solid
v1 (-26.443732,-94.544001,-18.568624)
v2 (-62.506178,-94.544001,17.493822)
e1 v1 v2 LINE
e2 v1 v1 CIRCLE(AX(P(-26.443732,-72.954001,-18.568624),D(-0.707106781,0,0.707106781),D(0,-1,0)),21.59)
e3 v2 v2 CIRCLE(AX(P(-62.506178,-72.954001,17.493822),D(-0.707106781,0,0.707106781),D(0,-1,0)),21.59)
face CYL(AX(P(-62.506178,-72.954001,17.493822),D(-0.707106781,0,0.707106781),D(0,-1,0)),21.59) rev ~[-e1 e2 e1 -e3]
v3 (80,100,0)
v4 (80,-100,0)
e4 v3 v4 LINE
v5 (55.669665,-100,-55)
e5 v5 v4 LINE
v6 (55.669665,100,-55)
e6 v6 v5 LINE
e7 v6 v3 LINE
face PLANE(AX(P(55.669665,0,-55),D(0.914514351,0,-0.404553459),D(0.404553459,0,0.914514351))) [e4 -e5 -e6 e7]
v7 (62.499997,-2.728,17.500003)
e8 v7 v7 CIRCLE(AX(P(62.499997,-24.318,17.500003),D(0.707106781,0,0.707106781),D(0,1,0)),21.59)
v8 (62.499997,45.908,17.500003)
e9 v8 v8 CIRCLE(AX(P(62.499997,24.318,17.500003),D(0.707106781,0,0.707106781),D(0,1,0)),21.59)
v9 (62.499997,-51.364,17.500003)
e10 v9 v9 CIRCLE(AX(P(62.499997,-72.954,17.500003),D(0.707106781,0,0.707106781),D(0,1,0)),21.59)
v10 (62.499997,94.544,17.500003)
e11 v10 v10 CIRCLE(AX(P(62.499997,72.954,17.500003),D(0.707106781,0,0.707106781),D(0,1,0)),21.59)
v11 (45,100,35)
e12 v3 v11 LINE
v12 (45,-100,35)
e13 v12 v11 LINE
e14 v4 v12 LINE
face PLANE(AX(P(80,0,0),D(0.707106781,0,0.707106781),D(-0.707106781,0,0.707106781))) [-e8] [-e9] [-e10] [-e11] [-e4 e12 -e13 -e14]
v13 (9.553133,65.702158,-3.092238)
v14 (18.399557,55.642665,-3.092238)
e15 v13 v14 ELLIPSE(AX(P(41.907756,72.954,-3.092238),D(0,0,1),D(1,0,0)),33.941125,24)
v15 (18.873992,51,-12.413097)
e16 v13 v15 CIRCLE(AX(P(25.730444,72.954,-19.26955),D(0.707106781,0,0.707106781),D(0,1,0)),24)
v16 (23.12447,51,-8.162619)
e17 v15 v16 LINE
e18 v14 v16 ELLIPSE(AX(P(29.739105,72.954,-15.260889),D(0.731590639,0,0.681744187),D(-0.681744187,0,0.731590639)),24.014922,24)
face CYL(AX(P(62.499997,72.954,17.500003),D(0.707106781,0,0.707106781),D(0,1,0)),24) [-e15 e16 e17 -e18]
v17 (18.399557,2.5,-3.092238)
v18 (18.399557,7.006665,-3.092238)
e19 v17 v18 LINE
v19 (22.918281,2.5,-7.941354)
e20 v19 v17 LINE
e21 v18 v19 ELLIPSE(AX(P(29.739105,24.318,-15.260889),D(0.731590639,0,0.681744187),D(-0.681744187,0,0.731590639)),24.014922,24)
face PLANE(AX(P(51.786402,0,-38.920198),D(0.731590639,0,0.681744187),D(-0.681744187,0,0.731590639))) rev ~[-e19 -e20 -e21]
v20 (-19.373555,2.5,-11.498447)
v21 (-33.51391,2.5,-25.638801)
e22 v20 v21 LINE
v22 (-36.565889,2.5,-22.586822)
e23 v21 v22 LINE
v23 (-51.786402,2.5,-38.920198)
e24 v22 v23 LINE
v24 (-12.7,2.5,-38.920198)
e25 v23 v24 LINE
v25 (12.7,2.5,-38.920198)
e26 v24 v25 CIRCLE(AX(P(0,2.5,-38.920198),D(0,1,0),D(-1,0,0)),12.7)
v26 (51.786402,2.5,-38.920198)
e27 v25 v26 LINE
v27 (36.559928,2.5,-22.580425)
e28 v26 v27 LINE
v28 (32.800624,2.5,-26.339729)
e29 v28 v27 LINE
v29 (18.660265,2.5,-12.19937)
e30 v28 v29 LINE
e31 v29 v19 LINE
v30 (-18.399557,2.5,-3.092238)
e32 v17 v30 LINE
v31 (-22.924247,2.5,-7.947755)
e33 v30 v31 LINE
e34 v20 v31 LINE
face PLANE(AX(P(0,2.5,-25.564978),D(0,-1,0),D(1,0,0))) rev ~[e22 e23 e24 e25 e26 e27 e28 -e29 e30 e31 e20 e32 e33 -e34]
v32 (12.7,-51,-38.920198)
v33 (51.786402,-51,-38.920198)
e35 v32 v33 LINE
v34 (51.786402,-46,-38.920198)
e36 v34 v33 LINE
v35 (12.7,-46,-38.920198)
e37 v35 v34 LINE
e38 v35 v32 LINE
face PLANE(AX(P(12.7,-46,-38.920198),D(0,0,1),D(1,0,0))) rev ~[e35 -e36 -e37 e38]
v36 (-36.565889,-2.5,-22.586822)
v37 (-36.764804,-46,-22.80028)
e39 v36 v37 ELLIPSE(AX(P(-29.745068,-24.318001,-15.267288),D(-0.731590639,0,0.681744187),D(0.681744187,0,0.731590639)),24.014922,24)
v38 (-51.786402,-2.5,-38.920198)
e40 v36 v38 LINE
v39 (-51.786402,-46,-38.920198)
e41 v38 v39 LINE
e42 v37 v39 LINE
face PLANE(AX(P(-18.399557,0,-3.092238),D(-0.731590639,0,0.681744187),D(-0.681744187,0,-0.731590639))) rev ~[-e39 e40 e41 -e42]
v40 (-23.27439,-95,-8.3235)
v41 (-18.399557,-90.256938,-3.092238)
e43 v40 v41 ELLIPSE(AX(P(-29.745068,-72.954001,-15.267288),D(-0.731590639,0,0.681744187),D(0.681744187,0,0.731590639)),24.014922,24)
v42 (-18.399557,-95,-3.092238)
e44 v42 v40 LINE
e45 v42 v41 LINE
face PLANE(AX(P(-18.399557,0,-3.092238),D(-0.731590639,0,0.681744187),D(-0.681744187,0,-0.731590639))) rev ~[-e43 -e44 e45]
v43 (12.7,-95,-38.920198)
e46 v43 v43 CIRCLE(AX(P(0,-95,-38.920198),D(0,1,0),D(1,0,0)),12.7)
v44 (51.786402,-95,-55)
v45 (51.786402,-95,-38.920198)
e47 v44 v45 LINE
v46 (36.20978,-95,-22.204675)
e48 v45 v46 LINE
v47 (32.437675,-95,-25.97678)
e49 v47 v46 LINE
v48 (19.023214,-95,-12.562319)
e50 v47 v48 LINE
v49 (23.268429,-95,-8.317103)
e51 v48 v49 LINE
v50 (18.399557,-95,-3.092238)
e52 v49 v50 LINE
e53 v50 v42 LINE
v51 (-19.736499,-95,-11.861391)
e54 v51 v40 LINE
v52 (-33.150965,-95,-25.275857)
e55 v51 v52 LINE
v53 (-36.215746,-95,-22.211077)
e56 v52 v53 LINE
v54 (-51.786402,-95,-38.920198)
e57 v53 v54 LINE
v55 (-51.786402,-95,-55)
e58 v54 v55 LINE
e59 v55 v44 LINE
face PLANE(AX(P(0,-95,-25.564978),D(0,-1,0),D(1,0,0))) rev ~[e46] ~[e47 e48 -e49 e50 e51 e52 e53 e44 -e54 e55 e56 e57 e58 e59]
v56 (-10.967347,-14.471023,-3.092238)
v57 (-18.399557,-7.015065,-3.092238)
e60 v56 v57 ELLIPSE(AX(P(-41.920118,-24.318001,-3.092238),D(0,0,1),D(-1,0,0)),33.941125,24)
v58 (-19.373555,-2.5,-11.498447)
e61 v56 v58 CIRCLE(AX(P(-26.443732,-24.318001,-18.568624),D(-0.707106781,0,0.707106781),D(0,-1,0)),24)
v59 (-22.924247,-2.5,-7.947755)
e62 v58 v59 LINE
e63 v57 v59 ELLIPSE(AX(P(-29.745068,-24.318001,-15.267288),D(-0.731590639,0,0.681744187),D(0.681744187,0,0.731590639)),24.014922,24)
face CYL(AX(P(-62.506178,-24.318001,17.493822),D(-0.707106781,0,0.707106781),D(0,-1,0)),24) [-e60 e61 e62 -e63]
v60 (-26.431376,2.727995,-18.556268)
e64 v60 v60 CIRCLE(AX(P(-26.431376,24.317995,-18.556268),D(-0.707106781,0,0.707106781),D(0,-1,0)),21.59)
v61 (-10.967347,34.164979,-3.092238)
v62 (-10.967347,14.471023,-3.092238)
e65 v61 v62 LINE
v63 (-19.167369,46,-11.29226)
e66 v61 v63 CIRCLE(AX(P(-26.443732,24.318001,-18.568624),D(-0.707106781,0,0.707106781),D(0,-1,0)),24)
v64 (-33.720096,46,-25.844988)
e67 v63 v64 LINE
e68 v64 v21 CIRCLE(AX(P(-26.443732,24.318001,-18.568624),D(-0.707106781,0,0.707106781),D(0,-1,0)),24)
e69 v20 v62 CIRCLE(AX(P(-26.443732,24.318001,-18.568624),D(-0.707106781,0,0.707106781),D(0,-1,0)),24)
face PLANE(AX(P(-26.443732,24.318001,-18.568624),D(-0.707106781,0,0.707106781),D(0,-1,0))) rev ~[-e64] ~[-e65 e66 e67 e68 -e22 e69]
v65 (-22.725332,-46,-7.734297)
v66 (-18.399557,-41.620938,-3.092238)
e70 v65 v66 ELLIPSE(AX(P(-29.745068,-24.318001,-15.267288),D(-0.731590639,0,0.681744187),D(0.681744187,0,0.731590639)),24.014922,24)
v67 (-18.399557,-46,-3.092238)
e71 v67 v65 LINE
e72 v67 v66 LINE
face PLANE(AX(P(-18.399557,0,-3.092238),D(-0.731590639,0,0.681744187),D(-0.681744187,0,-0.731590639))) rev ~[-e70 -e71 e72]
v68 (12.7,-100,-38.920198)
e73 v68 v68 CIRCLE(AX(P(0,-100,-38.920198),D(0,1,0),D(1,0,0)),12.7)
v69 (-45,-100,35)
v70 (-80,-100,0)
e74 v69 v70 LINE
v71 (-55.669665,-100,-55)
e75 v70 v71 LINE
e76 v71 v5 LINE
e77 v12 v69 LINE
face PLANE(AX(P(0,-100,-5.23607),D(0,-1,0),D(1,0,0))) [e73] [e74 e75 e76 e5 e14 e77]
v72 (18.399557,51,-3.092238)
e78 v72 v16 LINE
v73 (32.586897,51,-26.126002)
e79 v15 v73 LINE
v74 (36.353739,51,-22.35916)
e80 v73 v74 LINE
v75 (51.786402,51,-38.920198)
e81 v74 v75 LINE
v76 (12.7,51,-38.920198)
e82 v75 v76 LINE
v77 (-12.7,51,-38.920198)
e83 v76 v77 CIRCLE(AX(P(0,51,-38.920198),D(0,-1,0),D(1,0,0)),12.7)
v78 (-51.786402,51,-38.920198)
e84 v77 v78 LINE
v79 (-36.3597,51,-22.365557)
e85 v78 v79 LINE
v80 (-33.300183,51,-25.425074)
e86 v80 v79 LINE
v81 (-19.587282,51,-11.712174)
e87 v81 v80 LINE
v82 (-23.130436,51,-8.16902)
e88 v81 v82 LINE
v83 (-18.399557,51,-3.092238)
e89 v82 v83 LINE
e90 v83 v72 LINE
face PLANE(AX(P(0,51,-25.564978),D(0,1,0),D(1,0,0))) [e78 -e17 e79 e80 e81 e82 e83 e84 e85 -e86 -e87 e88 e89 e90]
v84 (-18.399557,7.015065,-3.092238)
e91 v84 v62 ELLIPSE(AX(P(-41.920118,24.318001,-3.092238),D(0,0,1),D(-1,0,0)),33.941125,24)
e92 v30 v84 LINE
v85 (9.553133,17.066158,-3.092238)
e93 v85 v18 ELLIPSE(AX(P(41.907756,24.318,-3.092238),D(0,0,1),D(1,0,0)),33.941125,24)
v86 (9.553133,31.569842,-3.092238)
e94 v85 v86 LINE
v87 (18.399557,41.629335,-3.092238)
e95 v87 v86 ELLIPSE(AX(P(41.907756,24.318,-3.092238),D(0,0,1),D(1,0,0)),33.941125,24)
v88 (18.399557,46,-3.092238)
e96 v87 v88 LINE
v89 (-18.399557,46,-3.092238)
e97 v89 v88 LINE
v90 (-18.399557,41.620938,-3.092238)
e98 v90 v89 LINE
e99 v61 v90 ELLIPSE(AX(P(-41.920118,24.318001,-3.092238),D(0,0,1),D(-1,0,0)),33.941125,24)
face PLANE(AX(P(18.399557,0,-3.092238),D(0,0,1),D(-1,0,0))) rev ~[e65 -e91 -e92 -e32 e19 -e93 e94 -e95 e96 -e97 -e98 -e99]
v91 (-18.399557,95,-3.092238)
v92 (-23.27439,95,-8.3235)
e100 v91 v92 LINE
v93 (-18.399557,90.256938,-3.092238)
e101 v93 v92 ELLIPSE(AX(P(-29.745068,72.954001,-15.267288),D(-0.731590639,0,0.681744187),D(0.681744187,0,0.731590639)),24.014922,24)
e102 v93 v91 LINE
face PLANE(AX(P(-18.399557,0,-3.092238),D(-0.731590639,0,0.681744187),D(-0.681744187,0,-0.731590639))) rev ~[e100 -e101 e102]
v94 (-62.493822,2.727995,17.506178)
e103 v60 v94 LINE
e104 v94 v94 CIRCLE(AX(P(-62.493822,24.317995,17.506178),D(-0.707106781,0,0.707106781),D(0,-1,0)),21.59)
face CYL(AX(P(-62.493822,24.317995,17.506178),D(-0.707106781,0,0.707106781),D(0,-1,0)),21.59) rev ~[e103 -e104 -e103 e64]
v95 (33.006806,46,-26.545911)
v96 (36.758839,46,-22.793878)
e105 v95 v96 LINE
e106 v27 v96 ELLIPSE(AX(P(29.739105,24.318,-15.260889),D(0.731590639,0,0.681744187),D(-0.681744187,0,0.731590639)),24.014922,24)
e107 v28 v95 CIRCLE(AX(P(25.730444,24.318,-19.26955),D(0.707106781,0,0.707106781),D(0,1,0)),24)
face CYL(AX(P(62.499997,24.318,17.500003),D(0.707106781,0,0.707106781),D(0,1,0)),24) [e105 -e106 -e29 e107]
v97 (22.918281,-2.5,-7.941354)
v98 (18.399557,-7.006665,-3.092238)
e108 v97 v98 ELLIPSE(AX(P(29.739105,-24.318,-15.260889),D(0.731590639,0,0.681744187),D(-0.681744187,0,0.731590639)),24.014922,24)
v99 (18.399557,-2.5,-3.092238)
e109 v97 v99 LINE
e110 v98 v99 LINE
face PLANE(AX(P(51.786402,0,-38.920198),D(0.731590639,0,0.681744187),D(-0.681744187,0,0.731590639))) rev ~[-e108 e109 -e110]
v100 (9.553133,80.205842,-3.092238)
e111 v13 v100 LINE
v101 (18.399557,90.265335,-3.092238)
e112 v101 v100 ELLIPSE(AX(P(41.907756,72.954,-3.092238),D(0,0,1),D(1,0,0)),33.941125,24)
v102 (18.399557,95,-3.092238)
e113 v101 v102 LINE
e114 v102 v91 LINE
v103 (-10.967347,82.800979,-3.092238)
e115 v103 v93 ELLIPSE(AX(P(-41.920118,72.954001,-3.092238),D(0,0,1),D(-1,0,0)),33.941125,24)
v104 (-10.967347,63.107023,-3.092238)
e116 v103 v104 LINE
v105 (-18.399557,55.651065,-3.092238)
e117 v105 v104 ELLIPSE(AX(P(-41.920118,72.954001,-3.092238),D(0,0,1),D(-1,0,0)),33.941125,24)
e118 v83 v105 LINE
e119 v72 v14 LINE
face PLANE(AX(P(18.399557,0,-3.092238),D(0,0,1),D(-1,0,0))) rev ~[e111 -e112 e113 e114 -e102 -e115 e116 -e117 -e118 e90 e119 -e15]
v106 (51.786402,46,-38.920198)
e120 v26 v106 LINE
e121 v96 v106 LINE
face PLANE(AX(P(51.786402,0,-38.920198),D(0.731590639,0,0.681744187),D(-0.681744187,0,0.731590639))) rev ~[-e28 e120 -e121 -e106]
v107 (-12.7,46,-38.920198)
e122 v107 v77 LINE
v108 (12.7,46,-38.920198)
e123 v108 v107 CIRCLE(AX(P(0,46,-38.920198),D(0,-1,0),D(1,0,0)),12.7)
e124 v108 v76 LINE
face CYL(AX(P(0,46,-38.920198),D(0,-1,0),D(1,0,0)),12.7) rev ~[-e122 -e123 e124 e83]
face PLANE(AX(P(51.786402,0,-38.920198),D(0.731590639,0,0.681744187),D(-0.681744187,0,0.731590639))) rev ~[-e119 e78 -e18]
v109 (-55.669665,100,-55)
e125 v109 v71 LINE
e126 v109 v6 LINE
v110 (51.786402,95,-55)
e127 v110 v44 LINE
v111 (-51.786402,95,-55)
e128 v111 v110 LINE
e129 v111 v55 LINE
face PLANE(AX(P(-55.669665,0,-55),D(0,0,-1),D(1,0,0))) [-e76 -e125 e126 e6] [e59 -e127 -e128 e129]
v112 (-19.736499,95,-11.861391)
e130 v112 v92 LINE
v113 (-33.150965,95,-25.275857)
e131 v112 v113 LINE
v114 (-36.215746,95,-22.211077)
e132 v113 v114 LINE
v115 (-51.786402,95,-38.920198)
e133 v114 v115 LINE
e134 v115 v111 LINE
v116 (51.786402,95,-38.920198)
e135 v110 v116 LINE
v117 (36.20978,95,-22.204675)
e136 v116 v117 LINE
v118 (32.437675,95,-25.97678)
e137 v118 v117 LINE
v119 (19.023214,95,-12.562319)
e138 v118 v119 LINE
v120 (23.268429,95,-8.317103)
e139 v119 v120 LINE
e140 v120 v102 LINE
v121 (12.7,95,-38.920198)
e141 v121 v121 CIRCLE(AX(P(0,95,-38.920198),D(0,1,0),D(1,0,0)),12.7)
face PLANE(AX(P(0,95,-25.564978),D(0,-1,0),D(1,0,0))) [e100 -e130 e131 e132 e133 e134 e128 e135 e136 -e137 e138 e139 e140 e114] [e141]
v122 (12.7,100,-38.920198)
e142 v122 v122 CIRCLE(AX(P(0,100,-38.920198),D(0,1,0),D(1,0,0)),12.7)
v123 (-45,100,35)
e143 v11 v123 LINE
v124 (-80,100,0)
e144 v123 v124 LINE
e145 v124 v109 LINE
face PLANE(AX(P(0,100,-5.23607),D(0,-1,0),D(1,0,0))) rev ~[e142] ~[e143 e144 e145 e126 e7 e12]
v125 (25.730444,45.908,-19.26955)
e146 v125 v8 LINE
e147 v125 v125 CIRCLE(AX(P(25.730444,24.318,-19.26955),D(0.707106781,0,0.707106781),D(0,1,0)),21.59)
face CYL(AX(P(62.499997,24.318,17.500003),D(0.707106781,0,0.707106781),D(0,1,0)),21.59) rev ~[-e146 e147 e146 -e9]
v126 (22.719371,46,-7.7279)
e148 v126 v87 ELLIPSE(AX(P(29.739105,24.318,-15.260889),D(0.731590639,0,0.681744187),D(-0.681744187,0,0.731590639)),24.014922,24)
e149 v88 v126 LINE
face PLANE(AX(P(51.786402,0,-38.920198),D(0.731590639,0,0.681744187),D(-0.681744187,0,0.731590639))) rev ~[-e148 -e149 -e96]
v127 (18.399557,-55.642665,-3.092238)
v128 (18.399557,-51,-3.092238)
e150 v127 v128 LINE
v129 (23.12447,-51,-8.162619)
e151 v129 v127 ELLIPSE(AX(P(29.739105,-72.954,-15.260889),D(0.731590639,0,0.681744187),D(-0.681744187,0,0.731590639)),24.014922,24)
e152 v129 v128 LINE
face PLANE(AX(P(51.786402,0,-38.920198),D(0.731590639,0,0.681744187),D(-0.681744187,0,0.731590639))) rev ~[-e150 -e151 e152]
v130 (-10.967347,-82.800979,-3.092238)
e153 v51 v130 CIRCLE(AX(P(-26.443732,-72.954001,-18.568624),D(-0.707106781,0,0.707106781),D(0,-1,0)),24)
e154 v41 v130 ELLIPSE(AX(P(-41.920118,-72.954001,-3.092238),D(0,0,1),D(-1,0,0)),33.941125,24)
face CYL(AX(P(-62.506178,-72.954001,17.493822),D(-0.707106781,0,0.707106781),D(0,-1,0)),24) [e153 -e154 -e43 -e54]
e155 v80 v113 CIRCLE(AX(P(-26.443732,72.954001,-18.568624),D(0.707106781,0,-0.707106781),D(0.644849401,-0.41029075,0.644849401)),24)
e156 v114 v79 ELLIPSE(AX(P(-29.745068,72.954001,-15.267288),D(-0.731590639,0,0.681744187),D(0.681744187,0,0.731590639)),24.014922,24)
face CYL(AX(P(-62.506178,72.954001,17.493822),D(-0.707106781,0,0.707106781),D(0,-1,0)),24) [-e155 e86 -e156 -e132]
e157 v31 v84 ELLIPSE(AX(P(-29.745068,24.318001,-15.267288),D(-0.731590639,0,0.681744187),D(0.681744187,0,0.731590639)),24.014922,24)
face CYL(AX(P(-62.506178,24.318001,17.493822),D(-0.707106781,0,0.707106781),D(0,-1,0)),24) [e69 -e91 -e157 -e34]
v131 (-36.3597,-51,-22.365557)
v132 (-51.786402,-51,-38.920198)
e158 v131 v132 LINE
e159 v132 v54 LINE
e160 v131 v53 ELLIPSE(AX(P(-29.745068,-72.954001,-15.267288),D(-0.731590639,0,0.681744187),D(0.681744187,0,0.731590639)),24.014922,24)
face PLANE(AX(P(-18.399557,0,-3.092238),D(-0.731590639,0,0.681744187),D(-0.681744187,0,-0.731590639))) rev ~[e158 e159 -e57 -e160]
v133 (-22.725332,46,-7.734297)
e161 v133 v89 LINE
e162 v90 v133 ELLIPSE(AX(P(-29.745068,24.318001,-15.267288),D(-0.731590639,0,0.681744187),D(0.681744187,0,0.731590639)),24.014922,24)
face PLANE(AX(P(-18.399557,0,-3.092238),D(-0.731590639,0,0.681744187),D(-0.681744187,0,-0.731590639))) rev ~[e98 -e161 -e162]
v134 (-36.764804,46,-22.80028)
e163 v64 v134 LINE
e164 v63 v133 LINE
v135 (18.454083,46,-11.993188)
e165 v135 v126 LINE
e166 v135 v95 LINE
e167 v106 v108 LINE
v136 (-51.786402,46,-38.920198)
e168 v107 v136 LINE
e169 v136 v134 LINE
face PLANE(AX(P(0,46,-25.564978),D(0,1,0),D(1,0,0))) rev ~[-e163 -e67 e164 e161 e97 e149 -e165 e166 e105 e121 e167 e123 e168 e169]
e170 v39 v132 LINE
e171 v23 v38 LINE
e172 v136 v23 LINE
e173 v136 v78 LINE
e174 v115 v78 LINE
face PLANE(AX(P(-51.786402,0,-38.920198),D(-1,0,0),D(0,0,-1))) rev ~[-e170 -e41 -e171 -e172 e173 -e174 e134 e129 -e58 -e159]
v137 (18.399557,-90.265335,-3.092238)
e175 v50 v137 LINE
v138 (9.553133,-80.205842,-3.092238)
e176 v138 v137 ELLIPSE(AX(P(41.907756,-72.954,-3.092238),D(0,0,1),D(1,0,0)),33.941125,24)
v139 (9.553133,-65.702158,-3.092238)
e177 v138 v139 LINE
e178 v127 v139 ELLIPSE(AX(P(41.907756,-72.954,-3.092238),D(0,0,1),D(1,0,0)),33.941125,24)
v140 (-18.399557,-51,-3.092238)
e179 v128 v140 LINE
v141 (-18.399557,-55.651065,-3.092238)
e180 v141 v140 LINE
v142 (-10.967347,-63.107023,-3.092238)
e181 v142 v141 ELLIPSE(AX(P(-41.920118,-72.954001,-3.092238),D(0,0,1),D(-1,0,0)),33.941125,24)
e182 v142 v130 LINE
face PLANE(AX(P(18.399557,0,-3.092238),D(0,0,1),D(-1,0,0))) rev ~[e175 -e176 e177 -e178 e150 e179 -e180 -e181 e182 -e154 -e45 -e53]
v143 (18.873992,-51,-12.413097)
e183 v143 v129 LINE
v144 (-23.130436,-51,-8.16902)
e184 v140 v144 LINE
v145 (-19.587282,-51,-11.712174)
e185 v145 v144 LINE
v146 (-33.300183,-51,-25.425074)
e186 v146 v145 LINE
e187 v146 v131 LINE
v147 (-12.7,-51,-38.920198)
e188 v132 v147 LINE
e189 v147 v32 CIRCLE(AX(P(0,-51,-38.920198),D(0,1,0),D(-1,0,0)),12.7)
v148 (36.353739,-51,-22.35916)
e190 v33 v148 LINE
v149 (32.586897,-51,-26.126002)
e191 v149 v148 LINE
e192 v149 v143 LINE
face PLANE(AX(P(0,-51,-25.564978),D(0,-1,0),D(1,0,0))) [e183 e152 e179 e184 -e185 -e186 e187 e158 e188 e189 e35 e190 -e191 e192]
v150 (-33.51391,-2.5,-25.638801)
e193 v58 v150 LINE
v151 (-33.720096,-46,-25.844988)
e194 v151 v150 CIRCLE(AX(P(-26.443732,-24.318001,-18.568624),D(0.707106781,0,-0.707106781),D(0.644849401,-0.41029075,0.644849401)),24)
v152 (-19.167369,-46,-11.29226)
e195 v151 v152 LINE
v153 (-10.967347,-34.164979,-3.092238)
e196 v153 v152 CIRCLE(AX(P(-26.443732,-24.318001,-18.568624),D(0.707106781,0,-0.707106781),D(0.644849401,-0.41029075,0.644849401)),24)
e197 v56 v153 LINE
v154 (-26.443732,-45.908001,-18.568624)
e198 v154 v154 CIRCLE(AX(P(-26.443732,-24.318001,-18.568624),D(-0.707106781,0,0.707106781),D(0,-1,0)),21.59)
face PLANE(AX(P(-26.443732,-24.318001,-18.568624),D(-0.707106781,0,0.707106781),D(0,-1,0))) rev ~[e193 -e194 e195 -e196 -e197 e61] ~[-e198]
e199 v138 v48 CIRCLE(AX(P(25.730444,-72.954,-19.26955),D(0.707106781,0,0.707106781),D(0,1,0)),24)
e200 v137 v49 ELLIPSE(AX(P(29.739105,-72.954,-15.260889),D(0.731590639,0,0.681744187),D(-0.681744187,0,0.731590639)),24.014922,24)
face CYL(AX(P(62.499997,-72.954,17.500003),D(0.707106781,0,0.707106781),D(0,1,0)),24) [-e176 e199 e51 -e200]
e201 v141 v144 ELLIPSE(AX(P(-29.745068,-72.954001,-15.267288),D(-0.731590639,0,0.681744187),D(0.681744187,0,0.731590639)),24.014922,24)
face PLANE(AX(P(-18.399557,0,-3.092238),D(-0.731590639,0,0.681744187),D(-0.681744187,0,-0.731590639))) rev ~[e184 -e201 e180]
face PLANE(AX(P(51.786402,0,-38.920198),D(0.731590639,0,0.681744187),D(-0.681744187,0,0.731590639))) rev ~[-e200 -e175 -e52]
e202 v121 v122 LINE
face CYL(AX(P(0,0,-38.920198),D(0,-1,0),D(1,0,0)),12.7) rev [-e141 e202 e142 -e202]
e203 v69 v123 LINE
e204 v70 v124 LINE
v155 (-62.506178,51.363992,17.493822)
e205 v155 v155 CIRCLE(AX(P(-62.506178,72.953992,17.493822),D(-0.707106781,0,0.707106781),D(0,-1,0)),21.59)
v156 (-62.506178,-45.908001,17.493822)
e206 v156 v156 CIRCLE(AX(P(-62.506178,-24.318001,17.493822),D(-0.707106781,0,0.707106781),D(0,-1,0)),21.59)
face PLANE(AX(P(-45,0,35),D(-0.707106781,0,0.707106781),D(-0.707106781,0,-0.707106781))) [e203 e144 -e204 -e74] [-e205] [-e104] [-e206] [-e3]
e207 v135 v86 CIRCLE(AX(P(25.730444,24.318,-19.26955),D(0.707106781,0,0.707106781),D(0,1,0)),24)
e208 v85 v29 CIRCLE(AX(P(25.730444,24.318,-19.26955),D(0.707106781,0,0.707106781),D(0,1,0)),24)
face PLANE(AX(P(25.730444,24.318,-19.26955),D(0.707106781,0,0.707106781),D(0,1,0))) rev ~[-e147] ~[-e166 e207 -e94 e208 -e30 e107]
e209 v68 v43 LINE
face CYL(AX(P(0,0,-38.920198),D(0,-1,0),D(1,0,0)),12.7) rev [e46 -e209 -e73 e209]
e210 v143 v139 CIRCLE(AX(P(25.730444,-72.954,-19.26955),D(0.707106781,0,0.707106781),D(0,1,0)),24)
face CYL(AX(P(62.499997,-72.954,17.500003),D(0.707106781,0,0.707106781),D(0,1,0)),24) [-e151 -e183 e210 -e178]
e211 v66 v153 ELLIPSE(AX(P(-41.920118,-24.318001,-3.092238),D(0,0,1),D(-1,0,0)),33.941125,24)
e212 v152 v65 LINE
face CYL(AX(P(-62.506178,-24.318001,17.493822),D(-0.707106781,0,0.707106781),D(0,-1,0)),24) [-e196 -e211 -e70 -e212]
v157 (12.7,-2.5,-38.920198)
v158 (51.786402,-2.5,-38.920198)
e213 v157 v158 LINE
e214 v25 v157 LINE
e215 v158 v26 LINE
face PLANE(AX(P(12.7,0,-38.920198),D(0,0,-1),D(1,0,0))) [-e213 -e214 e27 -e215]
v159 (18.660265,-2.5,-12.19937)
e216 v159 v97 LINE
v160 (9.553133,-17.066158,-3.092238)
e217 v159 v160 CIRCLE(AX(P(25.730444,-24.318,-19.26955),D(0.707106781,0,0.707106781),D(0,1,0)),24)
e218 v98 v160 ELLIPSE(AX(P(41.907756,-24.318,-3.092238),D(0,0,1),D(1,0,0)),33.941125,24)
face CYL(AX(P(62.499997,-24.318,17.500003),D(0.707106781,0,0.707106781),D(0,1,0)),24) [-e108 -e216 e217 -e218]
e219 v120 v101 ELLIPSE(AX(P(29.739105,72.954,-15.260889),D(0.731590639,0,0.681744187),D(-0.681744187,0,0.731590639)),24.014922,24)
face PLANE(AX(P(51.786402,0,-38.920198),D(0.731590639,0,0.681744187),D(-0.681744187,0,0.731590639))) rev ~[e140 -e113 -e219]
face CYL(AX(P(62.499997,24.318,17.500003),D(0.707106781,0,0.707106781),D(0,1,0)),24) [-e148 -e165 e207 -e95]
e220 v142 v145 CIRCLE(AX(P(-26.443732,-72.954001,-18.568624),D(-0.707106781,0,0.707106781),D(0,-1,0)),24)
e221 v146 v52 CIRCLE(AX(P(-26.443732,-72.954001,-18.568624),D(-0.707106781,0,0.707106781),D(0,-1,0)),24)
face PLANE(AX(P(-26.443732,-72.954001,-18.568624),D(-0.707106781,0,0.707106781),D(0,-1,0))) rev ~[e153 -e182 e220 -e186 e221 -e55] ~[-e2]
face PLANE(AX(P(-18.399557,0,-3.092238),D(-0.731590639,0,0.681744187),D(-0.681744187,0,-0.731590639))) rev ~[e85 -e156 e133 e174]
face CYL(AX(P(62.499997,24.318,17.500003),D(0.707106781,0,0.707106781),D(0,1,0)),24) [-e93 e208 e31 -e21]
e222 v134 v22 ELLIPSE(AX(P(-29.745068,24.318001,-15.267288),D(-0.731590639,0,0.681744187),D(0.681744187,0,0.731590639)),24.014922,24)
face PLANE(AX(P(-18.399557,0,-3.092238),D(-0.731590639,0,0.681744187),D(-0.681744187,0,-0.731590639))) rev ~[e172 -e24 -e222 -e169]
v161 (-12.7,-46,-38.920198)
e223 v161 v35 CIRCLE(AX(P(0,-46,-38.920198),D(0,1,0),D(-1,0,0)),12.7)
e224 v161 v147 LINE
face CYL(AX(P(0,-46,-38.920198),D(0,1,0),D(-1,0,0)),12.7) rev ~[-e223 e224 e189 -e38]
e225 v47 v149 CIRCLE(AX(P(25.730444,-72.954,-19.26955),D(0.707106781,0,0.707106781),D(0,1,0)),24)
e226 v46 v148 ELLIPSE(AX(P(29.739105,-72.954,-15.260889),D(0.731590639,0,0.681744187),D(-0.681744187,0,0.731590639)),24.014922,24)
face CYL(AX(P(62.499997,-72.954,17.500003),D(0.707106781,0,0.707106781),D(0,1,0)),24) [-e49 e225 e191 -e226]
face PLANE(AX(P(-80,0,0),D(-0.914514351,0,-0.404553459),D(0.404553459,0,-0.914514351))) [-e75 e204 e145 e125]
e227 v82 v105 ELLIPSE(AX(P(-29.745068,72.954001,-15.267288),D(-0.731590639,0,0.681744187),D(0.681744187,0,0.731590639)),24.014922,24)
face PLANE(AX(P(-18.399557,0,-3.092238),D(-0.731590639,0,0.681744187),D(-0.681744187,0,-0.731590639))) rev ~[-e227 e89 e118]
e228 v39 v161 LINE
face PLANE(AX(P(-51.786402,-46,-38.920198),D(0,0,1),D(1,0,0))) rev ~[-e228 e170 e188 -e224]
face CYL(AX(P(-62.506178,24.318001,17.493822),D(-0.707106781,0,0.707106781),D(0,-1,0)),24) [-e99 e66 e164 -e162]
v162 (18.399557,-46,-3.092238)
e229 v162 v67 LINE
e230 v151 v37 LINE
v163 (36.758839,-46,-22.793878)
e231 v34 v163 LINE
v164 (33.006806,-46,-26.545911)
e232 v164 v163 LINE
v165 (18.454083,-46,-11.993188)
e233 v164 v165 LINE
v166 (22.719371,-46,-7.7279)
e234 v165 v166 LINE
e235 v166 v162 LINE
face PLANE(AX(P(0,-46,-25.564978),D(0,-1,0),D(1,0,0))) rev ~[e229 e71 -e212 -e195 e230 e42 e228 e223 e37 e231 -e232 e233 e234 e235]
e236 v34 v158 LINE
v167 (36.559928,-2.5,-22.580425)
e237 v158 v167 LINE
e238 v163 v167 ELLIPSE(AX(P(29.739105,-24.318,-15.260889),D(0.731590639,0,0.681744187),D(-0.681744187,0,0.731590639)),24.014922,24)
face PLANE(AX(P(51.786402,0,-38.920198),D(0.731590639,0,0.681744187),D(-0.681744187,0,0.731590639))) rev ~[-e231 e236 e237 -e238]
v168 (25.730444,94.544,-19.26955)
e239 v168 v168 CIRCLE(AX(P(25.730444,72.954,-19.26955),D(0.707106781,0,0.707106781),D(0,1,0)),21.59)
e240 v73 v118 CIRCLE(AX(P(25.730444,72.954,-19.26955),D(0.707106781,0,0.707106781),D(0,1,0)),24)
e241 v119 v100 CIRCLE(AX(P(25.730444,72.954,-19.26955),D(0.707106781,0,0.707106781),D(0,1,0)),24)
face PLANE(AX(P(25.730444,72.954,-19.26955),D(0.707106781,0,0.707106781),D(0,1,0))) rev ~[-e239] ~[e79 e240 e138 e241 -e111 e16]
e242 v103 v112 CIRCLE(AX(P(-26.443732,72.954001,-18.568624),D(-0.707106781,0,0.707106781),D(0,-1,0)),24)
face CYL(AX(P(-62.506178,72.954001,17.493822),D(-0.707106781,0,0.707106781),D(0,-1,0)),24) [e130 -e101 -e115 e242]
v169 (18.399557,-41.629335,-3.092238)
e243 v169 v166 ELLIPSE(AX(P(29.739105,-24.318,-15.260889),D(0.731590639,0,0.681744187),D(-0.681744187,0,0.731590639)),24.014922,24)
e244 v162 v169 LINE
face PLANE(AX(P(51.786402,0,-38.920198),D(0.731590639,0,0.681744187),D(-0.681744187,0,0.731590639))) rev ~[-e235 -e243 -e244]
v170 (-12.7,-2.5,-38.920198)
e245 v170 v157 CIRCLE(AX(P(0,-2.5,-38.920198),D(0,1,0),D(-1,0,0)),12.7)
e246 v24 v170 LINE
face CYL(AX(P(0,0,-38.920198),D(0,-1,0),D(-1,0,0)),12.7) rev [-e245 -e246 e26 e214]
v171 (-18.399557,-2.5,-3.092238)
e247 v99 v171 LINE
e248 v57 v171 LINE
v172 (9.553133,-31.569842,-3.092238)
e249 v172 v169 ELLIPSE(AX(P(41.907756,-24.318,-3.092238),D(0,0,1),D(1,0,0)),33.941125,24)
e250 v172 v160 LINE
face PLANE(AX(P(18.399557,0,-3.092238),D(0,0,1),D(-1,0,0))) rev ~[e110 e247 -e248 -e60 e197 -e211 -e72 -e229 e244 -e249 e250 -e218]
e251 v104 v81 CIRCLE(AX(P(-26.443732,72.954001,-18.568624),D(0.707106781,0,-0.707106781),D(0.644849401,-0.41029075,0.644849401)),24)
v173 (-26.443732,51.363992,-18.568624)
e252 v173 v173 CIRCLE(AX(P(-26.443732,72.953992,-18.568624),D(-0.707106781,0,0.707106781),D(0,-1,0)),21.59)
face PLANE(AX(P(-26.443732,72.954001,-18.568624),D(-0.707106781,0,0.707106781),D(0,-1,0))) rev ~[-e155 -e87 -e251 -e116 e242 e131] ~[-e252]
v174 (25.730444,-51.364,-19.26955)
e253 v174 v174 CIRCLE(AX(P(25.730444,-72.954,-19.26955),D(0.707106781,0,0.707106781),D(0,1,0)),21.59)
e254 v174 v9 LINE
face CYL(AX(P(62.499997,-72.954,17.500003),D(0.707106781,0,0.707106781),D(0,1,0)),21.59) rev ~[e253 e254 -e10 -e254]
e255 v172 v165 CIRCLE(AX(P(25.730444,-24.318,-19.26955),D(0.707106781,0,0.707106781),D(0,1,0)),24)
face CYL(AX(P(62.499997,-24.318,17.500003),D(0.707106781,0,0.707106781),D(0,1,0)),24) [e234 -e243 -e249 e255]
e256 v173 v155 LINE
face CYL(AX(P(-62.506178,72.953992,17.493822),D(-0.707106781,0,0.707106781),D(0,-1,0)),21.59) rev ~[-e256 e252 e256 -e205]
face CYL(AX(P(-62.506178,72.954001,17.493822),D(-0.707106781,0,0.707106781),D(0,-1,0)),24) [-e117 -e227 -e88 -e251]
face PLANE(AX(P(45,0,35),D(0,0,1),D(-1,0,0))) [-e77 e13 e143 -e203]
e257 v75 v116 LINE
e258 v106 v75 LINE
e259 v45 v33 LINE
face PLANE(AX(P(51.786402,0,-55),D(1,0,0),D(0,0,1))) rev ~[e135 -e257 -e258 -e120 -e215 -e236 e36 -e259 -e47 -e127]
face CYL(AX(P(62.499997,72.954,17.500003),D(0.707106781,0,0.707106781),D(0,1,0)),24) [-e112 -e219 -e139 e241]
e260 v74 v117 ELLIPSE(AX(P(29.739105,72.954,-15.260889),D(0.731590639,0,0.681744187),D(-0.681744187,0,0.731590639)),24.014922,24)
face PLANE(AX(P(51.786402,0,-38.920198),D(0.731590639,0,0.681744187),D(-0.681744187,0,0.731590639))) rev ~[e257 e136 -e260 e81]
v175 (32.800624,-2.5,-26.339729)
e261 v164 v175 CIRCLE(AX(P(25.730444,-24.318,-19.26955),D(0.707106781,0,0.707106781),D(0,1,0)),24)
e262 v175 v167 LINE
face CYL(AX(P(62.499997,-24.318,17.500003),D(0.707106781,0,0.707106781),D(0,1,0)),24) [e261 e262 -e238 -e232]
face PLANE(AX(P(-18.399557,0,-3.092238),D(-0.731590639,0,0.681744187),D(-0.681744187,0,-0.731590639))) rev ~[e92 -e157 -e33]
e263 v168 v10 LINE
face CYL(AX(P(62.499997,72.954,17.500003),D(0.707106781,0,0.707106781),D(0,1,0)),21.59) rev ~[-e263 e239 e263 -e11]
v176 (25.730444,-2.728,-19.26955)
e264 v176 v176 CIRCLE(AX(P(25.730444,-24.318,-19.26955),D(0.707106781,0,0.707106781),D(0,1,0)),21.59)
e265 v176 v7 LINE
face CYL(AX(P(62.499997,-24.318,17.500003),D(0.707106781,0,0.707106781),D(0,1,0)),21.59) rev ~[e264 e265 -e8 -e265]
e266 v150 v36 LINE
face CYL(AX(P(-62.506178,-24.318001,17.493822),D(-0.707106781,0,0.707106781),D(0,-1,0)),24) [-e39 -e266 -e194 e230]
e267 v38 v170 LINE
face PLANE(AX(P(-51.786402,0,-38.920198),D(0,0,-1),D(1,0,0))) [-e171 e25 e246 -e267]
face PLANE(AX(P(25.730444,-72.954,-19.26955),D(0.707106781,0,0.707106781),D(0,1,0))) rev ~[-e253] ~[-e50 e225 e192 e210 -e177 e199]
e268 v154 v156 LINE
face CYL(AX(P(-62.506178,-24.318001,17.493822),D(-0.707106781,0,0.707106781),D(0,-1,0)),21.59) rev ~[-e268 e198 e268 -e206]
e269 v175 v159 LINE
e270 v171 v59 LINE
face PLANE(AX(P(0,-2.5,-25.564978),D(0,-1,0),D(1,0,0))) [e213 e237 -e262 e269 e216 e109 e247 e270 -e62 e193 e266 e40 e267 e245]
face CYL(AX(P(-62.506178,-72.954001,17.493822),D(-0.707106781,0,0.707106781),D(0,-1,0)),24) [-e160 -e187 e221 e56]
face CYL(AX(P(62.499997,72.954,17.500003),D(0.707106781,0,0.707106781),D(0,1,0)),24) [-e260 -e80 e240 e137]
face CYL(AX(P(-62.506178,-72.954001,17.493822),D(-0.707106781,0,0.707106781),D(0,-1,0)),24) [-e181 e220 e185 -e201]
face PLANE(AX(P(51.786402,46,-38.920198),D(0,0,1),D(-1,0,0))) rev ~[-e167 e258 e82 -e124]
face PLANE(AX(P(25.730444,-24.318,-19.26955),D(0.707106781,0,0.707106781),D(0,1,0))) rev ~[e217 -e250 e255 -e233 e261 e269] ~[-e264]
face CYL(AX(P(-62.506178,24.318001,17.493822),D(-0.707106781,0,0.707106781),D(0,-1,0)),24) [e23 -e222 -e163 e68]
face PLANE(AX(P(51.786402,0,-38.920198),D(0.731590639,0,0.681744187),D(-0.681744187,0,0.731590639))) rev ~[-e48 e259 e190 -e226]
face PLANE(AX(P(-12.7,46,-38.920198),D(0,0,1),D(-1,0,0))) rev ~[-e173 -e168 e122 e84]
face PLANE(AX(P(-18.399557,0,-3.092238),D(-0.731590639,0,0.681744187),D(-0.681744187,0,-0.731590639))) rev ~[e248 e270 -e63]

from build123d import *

# Parameters (mm, degrees)
F1_DEPTH  = 100
F2_R      = 21.59
F4_DEPTH  = 52
F3_R      = 21.59
F5_DEPTH  = 52
F6_DEPTH  = 2.5
F7_DEPTH  = 95
F8_DEPTH  = 2.5
F3_R_2    = 24
F9_DEPTH  = 51
F10_START = 43.5
F10_DEPTH = 5
F11_START = 43.5
F11_DEPTH = 5
F2_R_2    = 24
F12_DEPTH = 52


# Not quite as in the source:
# - a feature names something its author has since deleted; it is built from what else it names


with BuildPart() as f1:
    # F0 (on Front) → F1 (new body, symmetric)
    with BuildSketch(Plane.XZ):
        Polygon((-80, 0), (-55.6696653366, -55), (-51.7864015908, -55), (-51.7864015908, -38.9201976359), (-18.3995570987, -3.0922384467), (18.3995570987, -3.0922384467), (51.7864015908, -38.9201976359), (51.7864015908, -55), (55.6696653366, -55), (80, 0), (45, 35), (-45, 35), align=None)
        with BuildLine():
            Line((-18.3995570987, -3.0922384467), (-51.7864015908, -38.9201976359))
            Line((-51.7864015908, -38.9201976359), (-12.7, -38.9201976359))
            ThreePointArc((-12.7, -38.9201976359), (0, -26.2201976359), (12.7, -38.9201976359))
            Line((12.7, -38.9201976359), (51.7864015908, -38.9201976359))
            Line((51.7864015908, -38.9201976359), (18.3995570987, -3.0922384467))
            Line((18.3995570987, -3.0922384467), (-18.3995570987, -3.0922384467))
        make_face()
        with BuildLine():
            Line((-51.7864015908, -38.9201976359), (-51.7864015908, -55))
            Line((-51.7864015908, -55), (51.7864015908, -55))
            Line((51.7864015908, -55), (51.7864015908, -38.9201976359))
            Line((51.7864015908, -38.9201976359), (12.7, -38.9201976359))
            ThreePointArc((12.7, -38.9201976359), (0, -51.6201976359), (-12.7, -38.9201976359))
            Line((-12.7, -38.9201976359), (-51.7864015908, -38.9201976359))
        make_face()
    extrude(amount=F1_DEPTH, both=True)

    # F2 (on face) → F4 (cut)
    with BuildSketch(Plane(origin=(40, 0, 40), x_dir=(0, 1, 0), z_dir=(0.7071067812, 0, 0.7071067812))):
        with Locations((72.954, -31.8198008825)):
            Circle(F2_R)
        with Locations((24.318, -31.8198008825)):
            Circle(F2_R)
        with Locations((-24.318, -31.8198008824)):
            Circle(F2_R)
        with Locations((-72.954, -31.8198008825)):
            Circle(F2_R)
    extrude(amount=-F4_DEPTH, mode=Mode.SUBTRACT)

    # F3 (on face) → F5 (cut)
    with BuildSketch(Plane(origin=(-40, 0, 40), x_dir=(0, -1, 0), z_dir=(-0.7071067812, 0, 0.7071067812))):
        with Locations((-72.9539923101, -31.8285424949)):
            Circle(F3_R)
        with Locations((-24.3179954494, -31.8110678119)):
            Circle(F3_R)
        with Locations((24.3180014113, -31.8285424949)):
            Circle(F3_R)
        with Locations((72.9540014113, -31.8285424949)):
            Circle(F3_R)
    extrude(amount=-F5_DEPTH, mode=Mode.SUBTRACT)

    # F0 (on Front) → F6 (join, symmetric)
    with BuildSketch(Plane.XZ):
        with BuildLine():
            Line((-18.3995570987, -3.0922384467), (-51.7864015908, -38.9201976359))
            Line((-51.7864015908, -38.9201976359), (-12.7, -38.9201976359))
            ThreePointArc((-12.7, -38.9201976359), (0, -26.2201976359), (12.7, -38.9201976359))
            Line((12.7, -38.9201976359), (51.7864015908, -38.9201976359))
            Line((51.7864015908, -38.9201976359), (18.3995570987, -3.0922384467))
            Line((18.3995570987, -3.0922384467), (-18.3995570987, -3.0922384467))
        make_face()
    extrude(amount=F6_DEPTH, both=True)

    # F0 (on Front) → F7 (cut, symmetric)
    with BuildSketch(Plane.XZ):
        with BuildLine():
            Line((-18.3995570987, -3.0922384467), (-51.7864015908, -38.9201976359))
            Line((-51.7864015908, -38.9201976359), (-12.7, -38.9201976359))
            ThreePointArc((-12.7, -38.9201976359), (0, -26.2201976359), (12.7, -38.9201976359))
            Line((12.7, -38.9201976359), (51.7864015908, -38.9201976359))
            Line((51.7864015908, -38.9201976359), (18.3995570987, -3.0922384467))
            Line((18.3995570987, -3.0922384467), (-18.3995570987, -3.0922384467))
        make_face()
        with BuildLine():
            Line((-51.7864015908, -38.9201976359), (-51.7864015908, -55))
            Line((-51.7864015908, -55), (51.7864015908, -55))
            Line((51.7864015908, -55), (51.7864015908, -38.9201976359))
            Line((51.7864015908, -38.9201976359), (12.7, -38.9201976359))
            ThreePointArc((12.7, -38.9201976359), (0, -51.6201976359), (-12.7, -38.9201976359))
            Line((-12.7, -38.9201976359), (-51.7864015908, -38.9201976359))
        make_face()
    extrude(amount=F7_DEPTH, both=True, mode=Mode.SUBTRACT)

    # F0 (on Front) → F8 (join, symmetric)
    with BuildSketch(Plane.XZ):
        with BuildLine():
            Line((-18.3995570987, -3.0922384467), (-51.7864015908, -38.9201976359))
            Line((-51.7864015908, -38.9201976359), (-12.7, -38.9201976359))
            ThreePointArc((-12.7, -38.9201976359), (0, -26.2201976359), (12.7, -38.9201976359))
            Line((12.7, -38.9201976359), (51.7864015908, -38.9201976359))
            Line((51.7864015908, -38.9201976359), (18.3995570987, -3.0922384467))
            Line((18.3995570987, -3.0922384467), (-18.3995570987, -3.0922384467))
        make_face()
    extrude(amount=F8_DEPTH, both=True)



with BuildPart() as f9:
    # F3 (on face) → F9 (new body)
    with BuildSketch(Plane(origin=(-40, 0, 40), x_dir=(0, -1, 0), z_dir=(-0.7071067812, 0, 0.7071067812))):
        with Locations((24.3180014113, -31.8285424949)):
            Circle(F3_R_2)
        with Locations((24.3180014113, -31.8285424949)):
            Circle(F3_R, mode=Mode.SUBTRACT)
    extrude(amount=-F9_DEPTH)


with BuildPart() as f9b:
    # F3 (on face) → F9, piece 2 (new body)
    with BuildSketch(Plane(origin=(-40, 0, 40), x_dir=(0, -1, 0), z_dir=(-0.7071067812, 0, 0.7071067812))):
        with Locations((72.9540014113, -31.8285424949)):
            Circle(F3_R_2)
        with Locations((72.9540014113, -31.8285424949)):
            Circle(F3_R, mode=Mode.SUBTRACT)
    extrude(amount=-F9_DEPTH)


with BuildPart() as f9c:
    # F3 (on face) → F9, piece 3 (new body)
    with BuildSketch(Plane(origin=(-40, 0, 40), x_dir=(0, -1, 0), z_dir=(-0.7071067812, 0, 0.7071067812))):
        with Locations((-24.3180014113, -31.8285424949)):
            Circle(F3_R_2)
        with Locations((-24.3179954494, -31.8110678119)):
            Circle(F3_R, mode=Mode.SUBTRACT)
    extrude(amount=-F9_DEPTH)


with BuildPart() as f9d:
    # F3 (on face) → F9, piece 4 (new body)
    with BuildSketch(Plane(origin=(-40, 0, 40), x_dir=(0, -1, 0), z_dir=(-0.7071067812, 0, 0.7071067812))):
        with Locations((-72.9540014113, -31.8285424949)):
            Circle(F3_R_2)
        with Locations((-72.9539923101, -31.8285424949)):
            Circle(F3_R, mode=Mode.SUBTRACT)
    extrude(amount=-F9_DEPTH)


with BuildPart() as f1_1:
    add(f1.part)

    add(f9.part)  # F10 merges F9

    add(f9b.part)  # F10 merges F9b
    # F8_face (on face) → F10 (join)
    with BuildSketch(Plane(origin=(0, -2.5, -22.7617883235), x_dir=(1, 0, 0), z_dir=(0, -1, 0)).offset(F10_START)):
        with BuildLine():
            Line((-18.3995570987, 19.6695498768), (-51.7864015908, -16.1584093124))
            Line((-51.7864015908, -16.1584093124), (-12.7, -16.1584093124))
            ThreePointArc((-12.7, -16.1584093124), (0, -3.4584093124), (12.7, -16.1584093124))
            Line((12.7, -16.1584093124), (51.7864015908, -16.1584093124))
            Line((51.7864015908, -16.1584093124), (18.3995570987, 19.6695498768))
            Line((18.3995570987, 19.6695498768), (-18.3995570987, 19.6695498768))
        make_face()
    extrude(amount=F10_DEPTH)


    add(f9c.part)  # F11 merges F9c

    add(f9d.part)  # F11 merges F9d
    # F8_face1 (on face) → F11 (join)
    with BuildSketch(Plane(origin=(0, 2.5, -22.7617883235), x_dir=(1, 0, 0), z_dir=(0, 1, 0)).offset(F11_START)):
        with BuildLine():
            Line((-51.7864015908, 16.1584093124), (-18.3995570987, -19.6695498768))
            Line((-18.3995570987, -19.6695498768), (18.3995570987, -19.6695498768))
            Line((18.3995570987, -19.6695498768), (51.7864015908, 16.1584093124))
            Line((51.7864015908, 16.1584093124), (12.7, 16.1584093124))
            ThreePointArc((12.7, 16.1584093124), (0, 3.4584093124), (-12.7, 16.1584093124))
            Line((-12.7, 16.1584093124), (-51.7864015908, 16.1584093124))
        make_face()
    extrude(amount=F11_DEPTH)


with BuildPart() as f12:
    # F2 (on face) → F12 (new body)
    with BuildSketch(Plane(origin=(40, 0, 40), x_dir=(0, 1, 0), z_dir=(0.7071067812, 0, 0.7071067812))):
        with Locations((-72.954, -31.8198008825)):
            Circle(F2_R_2)
        with Locations((-72.954, -31.8198008825)):
            Circle(F2_R, mode=Mode.SUBTRACT)
    extrude(amount=-F12_DEPTH)


with BuildPart() as f12b:
    # F2 (on face) → F12, piece 2 (new body)
    with BuildSketch(Plane(origin=(40, 0, 40), x_dir=(0, 1, 0), z_dir=(0.7071067812, 0, 0.7071067812))):
        with Locations((-24.318, -31.8198008824)):
            Circle(F2_R_2)
        with Locations((-24.318, -31.8198008824)):
            Circle(F2_R, mode=Mode.SUBTRACT)
    extrude(amount=-F12_DEPTH)


with BuildPart() as f12c:
    # F2 (on face) → F12, piece 3 (new body)
    with BuildSketch(Plane(origin=(40, 0, 40), x_dir=(0, 1, 0), z_dir=(0.7071067812, 0, 0.7071067812))):
        with Locations((24.318, -31.8198008825)):
            Circle(F2_R_2)
        with Locations((24.318, -31.8198008825)):
            Circle(F2_R, mode=Mode.SUBTRACT)
    extrude(amount=-F12_DEPTH)


with BuildPart() as f12d:
    # F2 (on face) → F12, piece 4 (new body)
    with BuildSketch(Plane(origin=(40, 0, 40), x_dir=(0, 1, 0), z_dir=(0.7071067812, 0, 0.7071067812))):
        with Locations((72.954, -31.8198008825)):
            Circle(F2_R_2)
        with Locations((72.954, -31.8198008825)):
            Circle(F2_R, mode=Mode.SUBTRACT)
    extrude(amount=-F12_DEPTH)


with BuildPart() as f1_2:
    add(f1_1.part)

    # F13: union F12b, F12, F12d, F12c
    add(f12b.part)
    add(f12.part)
    add(f12d.part)
    add(f12c.part)


solid = f1_2.part
